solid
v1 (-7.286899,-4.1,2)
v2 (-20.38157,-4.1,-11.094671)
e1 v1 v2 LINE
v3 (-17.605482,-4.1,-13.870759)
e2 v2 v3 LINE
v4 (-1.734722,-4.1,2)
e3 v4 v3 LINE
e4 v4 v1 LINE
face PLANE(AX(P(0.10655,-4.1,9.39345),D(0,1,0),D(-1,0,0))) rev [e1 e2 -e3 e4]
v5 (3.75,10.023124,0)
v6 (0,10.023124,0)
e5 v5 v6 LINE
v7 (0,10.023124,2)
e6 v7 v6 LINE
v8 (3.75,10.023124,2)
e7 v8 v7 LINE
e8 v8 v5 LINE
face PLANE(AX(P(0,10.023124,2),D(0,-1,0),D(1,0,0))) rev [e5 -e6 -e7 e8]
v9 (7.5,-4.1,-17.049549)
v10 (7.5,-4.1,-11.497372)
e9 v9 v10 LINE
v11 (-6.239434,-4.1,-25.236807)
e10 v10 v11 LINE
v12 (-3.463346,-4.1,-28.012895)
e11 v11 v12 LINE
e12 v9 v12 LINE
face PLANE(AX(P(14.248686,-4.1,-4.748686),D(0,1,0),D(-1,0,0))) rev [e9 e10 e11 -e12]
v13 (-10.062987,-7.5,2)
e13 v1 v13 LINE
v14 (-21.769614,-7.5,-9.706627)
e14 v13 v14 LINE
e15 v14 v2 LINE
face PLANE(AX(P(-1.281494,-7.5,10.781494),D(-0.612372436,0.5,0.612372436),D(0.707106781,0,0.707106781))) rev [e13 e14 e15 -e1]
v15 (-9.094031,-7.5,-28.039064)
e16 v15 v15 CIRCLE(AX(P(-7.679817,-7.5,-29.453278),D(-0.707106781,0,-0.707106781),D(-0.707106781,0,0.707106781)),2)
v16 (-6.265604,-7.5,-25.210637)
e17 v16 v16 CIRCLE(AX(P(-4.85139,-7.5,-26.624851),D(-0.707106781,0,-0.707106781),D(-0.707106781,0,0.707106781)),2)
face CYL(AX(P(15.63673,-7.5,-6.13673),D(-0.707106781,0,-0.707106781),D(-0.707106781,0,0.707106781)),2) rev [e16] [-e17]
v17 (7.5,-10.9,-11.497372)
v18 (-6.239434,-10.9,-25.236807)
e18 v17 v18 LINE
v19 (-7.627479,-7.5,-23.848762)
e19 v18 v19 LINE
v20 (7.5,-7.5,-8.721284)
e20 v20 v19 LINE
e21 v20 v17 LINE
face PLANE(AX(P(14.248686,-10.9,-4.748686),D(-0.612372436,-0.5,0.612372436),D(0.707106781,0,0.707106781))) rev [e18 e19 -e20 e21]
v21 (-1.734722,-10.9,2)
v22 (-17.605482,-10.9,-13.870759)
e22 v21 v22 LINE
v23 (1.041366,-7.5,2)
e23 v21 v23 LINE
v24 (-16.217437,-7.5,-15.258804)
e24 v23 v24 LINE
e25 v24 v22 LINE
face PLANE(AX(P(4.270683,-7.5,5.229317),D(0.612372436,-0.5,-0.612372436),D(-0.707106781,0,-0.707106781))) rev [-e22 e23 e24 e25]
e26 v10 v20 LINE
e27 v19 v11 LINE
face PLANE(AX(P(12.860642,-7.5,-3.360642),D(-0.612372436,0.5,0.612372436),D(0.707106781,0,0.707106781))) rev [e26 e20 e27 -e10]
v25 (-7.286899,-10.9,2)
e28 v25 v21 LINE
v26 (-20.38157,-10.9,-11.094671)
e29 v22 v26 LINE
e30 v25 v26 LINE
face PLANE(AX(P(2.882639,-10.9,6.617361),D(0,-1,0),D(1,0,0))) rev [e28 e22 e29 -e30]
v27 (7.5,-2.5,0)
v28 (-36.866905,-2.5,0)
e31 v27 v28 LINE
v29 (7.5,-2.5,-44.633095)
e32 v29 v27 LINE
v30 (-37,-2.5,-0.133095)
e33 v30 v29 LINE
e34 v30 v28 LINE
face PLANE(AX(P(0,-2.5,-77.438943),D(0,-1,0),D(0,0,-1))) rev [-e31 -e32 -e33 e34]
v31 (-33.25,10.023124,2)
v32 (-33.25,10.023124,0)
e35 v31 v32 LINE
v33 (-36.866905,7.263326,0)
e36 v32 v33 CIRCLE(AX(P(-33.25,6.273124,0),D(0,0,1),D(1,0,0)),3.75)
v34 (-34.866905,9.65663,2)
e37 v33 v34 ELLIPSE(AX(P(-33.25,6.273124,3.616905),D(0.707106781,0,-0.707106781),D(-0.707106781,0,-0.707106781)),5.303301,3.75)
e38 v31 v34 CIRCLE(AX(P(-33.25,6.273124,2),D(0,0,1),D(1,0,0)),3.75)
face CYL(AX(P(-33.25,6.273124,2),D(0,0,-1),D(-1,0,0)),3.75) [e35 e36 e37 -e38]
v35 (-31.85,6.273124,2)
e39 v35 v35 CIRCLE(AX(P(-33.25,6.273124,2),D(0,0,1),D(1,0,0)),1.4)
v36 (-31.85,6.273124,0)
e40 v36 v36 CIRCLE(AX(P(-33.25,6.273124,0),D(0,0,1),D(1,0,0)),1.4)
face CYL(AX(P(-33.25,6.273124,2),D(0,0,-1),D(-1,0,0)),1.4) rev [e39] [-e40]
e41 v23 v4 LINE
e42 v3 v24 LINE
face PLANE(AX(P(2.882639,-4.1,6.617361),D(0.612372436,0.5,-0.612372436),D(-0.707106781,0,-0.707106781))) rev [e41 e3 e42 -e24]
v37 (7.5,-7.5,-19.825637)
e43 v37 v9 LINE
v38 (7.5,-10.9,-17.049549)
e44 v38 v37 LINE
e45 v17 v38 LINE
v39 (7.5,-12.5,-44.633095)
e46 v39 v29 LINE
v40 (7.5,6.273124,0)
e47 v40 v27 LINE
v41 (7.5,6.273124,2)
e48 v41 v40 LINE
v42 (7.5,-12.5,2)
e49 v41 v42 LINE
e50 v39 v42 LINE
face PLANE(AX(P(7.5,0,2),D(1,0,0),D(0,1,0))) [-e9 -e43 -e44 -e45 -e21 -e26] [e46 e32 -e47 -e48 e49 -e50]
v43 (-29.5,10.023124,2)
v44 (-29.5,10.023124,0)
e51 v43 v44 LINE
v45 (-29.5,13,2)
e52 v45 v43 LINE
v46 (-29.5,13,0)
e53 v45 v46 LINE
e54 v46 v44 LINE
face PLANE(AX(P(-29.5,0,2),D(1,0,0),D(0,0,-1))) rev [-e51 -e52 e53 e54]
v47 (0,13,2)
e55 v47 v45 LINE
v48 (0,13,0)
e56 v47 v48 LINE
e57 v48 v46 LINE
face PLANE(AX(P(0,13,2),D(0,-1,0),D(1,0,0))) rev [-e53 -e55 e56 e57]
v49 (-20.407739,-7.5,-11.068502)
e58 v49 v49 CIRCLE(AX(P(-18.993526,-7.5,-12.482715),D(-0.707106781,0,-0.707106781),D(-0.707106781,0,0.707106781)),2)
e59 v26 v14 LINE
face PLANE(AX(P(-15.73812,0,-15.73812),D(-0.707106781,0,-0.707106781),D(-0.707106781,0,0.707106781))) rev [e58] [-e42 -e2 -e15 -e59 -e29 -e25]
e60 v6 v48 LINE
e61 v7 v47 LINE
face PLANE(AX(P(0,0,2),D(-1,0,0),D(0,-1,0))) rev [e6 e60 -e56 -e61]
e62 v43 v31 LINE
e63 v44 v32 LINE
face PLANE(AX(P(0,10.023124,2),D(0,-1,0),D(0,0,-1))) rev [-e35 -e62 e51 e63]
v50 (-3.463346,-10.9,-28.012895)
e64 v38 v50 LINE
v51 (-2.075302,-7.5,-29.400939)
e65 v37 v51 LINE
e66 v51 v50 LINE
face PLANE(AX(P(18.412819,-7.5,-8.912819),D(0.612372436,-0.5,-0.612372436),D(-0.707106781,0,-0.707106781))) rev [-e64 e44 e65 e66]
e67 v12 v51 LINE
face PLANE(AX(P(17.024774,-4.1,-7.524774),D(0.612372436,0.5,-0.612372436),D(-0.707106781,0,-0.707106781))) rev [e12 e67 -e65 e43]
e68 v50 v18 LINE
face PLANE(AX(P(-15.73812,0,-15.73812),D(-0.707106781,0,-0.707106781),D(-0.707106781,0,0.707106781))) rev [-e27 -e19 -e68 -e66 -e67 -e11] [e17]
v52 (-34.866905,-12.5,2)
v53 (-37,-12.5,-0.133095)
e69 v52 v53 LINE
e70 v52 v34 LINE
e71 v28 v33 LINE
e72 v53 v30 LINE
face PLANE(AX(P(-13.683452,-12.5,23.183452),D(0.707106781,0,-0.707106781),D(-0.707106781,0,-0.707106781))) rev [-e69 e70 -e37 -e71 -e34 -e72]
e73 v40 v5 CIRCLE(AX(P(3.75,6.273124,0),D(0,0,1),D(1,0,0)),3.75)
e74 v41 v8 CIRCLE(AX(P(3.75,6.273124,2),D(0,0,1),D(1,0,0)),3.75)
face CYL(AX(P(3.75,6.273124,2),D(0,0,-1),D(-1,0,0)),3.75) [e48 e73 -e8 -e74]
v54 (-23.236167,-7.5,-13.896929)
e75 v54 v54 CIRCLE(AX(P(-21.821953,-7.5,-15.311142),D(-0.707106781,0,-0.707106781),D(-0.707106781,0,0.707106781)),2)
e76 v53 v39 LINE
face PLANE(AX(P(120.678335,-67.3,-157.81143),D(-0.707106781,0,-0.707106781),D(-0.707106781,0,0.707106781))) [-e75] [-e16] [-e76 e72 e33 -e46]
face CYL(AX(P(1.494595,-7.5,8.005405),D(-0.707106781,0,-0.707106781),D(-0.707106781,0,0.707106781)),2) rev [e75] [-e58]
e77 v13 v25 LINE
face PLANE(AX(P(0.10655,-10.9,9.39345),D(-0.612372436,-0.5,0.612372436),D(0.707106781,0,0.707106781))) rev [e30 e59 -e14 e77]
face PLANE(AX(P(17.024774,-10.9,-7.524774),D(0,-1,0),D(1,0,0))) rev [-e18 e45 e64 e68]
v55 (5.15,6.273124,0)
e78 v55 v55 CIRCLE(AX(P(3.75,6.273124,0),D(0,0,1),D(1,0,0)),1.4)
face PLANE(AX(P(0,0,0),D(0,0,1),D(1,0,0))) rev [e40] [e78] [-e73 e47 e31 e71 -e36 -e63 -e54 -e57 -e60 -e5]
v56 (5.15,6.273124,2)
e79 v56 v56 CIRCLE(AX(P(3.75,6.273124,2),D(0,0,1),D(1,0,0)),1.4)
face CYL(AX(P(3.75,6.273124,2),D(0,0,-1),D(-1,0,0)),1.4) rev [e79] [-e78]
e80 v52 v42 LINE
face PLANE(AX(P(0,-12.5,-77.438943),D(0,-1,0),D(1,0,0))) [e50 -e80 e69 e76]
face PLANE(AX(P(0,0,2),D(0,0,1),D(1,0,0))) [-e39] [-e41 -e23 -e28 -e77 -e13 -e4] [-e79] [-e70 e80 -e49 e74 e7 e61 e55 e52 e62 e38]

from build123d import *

# Parameters (mm, degrees)
SKETCH1_R           = 1.4
BOSS_EXTRUDE1_DEPTH = 2
BOSS_EXTRUDE2_START = -12.5
BOSS_EXTRUDE2_DEPTH = 10
SKETCH2_R           = 2
CUT_EXTRUDE1_DEPTH  = 40.088742751
CUT_EXTRUDE2_START  = -4
SKETCH2_3_R         = 2
CUT_EXTRUDE2_DEPTH  = 36.088742751
SKETCH4_W           = 3.030010437
SKETCH4_H           = 28.00665459
CUT_EXTRUDE3_DEPTH  = 40.088742751


# Read off the part's stored shape, not the designer's step: Boss-Extrude2
with BuildPart() as part:
    # Sketch1 → Boss-Extrude1 (new body)
    with BuildSketch(Plane.XY):
        with BuildLine():
            Line((7.5, -2.5), (7.5, 6.273123532))
            ThreePointArc((7.5, 6.273123532), (6.401650429, 8.924773961), (3.75, 10.023123532))
            Line((3.75, 10.023123532), (0, 10.023123532))
            Line((0, 10.023123532), (0, 13))
            Line((0, 13), (-29.5, 13))
            Line((-29.5, 13), (-29.5, 10.023123532))
            Line((-29.5, 10.023123532), (-33.25, 10.023123532))
            ThreePointArc((-33.25, 10.023123532), (-35.901650429, 8.924773961), (-37, 6.273123532))
            Line((-37, 6.273123532), (-37, -2.5))
            Line((-37, -2.5), (7.5, -2.5))
        make_face()
        with Locations((3.75, 6.273123532)):
            Circle(SKETCH1_R, mode=Mode.SUBTRACT)
        with Locations((-33.25, 6.273123532)):
            Circle(SKETCH1_R, mode=Mode.SUBTRACT)
    extrude(amount=BOSS_EXTRUDE1_DEPTH)

    # Boss-Extrude2 outline → Boss-Extrude2 (add)
    with BuildSketch(Plane(origin=(0, 0, 0), x_dir=(1, 0, 0), z_dir=(0, 1, 0)).offset(BOSS_EXTRUDE2_START)):
        Polygon((7.5, 44.633095244), (-37, 0.133095244), (-37, -2), (7.5, -2), align=None)
    extrude(amount=BOSS_EXTRUDE2_DEPTH)

    # Sketch2 → Cut-Extrude1 (cut, through all)
    with BuildSketch(Plane(origin=(-18.566547622, 0, -18.566547622), x_dir=(-0.7071067811865457, 0, 0.7071067811865495), z_dir=(-0.7071067811865495, 0, -0.7071067811865457))):
        with Locations((4.603838354, -7.5)):
            Circle(SKETCH2_R)
        with Locations((-15.396161646, -7.5)):
            Circle(SKETCH2_R)
    extrude(amount=-CUT_EXTRUDE1_DEPTH, mode=Mode.SUBTRACT)

    # Sketch2<3> → Cut-Extrude2 (cut, through all)
    # profile 1 of 2: a face of its own
    with BuildSketch(Plane(origin=(-18.566547622, 0, -18.566547622), x_dir=(-0.7071067811865457, 0, 0.7071067811865495), z_dir=(-0.7071067811865495, 0, -0.7071067811865457)).offset(CUT_EXTRUDE2_START)):
        Polygon((8.529820185, -7.5), (6.566829269, -4.1), (2.640847439, -4.1), (0.677856524, -7.5), (2.640847439, -10.9), (6.566829269, -10.9), align=None)
        with Locations((4.603838354, -7.5)):
            Circle(SKETCH2_3_R, mode=Mode.SUBTRACT)
    # profile 2 of 2: a face of its own
    with BuildSketch(Plane(origin=(-18.566547622, 0, -18.566547622), x_dir=(-0.7071067811865457, 0, 0.7071067811865495), z_dir=(-0.7071067811865495, 0, -0.7071067811865457)).offset(CUT_EXTRUDE2_START)):
        Polygon((-11.470179815, -7.5), (-13.433170731, -4.1), (-17.359152561, -4.1), (-19.322143476, -7.5), (-17.359152561, -10.9), (-13.433170731, -10.9), align=None)
        with Locations((-15.396161646, -7.5)):
            Circle(SKETCH2_3_R, mode=Mode.SUBTRACT)
    extrude(amount=-CUT_EXTRUDE2_DEPTH, mode=Mode.SUBTRACT)

    # Sketch4 → Cut-Extrude3 (cut, through all)
    with BuildSketch(Plane(origin=(-18.566547622, 0, -18.566547622), x_dir=(-0.7071067811865457, 0, 0.7071067811865495), z_dir=(-0.7071067811865495, 0, -0.7071067811865457))):
        with Locations((27.583843573, 1.503327295)):
            Rectangle(SKETCH4_W, SKETCH4_H)
    extrude(amount=-CUT_EXTRUDE3_DEPTH, mode=Mode.SUBTRACT)


solid = part.part
